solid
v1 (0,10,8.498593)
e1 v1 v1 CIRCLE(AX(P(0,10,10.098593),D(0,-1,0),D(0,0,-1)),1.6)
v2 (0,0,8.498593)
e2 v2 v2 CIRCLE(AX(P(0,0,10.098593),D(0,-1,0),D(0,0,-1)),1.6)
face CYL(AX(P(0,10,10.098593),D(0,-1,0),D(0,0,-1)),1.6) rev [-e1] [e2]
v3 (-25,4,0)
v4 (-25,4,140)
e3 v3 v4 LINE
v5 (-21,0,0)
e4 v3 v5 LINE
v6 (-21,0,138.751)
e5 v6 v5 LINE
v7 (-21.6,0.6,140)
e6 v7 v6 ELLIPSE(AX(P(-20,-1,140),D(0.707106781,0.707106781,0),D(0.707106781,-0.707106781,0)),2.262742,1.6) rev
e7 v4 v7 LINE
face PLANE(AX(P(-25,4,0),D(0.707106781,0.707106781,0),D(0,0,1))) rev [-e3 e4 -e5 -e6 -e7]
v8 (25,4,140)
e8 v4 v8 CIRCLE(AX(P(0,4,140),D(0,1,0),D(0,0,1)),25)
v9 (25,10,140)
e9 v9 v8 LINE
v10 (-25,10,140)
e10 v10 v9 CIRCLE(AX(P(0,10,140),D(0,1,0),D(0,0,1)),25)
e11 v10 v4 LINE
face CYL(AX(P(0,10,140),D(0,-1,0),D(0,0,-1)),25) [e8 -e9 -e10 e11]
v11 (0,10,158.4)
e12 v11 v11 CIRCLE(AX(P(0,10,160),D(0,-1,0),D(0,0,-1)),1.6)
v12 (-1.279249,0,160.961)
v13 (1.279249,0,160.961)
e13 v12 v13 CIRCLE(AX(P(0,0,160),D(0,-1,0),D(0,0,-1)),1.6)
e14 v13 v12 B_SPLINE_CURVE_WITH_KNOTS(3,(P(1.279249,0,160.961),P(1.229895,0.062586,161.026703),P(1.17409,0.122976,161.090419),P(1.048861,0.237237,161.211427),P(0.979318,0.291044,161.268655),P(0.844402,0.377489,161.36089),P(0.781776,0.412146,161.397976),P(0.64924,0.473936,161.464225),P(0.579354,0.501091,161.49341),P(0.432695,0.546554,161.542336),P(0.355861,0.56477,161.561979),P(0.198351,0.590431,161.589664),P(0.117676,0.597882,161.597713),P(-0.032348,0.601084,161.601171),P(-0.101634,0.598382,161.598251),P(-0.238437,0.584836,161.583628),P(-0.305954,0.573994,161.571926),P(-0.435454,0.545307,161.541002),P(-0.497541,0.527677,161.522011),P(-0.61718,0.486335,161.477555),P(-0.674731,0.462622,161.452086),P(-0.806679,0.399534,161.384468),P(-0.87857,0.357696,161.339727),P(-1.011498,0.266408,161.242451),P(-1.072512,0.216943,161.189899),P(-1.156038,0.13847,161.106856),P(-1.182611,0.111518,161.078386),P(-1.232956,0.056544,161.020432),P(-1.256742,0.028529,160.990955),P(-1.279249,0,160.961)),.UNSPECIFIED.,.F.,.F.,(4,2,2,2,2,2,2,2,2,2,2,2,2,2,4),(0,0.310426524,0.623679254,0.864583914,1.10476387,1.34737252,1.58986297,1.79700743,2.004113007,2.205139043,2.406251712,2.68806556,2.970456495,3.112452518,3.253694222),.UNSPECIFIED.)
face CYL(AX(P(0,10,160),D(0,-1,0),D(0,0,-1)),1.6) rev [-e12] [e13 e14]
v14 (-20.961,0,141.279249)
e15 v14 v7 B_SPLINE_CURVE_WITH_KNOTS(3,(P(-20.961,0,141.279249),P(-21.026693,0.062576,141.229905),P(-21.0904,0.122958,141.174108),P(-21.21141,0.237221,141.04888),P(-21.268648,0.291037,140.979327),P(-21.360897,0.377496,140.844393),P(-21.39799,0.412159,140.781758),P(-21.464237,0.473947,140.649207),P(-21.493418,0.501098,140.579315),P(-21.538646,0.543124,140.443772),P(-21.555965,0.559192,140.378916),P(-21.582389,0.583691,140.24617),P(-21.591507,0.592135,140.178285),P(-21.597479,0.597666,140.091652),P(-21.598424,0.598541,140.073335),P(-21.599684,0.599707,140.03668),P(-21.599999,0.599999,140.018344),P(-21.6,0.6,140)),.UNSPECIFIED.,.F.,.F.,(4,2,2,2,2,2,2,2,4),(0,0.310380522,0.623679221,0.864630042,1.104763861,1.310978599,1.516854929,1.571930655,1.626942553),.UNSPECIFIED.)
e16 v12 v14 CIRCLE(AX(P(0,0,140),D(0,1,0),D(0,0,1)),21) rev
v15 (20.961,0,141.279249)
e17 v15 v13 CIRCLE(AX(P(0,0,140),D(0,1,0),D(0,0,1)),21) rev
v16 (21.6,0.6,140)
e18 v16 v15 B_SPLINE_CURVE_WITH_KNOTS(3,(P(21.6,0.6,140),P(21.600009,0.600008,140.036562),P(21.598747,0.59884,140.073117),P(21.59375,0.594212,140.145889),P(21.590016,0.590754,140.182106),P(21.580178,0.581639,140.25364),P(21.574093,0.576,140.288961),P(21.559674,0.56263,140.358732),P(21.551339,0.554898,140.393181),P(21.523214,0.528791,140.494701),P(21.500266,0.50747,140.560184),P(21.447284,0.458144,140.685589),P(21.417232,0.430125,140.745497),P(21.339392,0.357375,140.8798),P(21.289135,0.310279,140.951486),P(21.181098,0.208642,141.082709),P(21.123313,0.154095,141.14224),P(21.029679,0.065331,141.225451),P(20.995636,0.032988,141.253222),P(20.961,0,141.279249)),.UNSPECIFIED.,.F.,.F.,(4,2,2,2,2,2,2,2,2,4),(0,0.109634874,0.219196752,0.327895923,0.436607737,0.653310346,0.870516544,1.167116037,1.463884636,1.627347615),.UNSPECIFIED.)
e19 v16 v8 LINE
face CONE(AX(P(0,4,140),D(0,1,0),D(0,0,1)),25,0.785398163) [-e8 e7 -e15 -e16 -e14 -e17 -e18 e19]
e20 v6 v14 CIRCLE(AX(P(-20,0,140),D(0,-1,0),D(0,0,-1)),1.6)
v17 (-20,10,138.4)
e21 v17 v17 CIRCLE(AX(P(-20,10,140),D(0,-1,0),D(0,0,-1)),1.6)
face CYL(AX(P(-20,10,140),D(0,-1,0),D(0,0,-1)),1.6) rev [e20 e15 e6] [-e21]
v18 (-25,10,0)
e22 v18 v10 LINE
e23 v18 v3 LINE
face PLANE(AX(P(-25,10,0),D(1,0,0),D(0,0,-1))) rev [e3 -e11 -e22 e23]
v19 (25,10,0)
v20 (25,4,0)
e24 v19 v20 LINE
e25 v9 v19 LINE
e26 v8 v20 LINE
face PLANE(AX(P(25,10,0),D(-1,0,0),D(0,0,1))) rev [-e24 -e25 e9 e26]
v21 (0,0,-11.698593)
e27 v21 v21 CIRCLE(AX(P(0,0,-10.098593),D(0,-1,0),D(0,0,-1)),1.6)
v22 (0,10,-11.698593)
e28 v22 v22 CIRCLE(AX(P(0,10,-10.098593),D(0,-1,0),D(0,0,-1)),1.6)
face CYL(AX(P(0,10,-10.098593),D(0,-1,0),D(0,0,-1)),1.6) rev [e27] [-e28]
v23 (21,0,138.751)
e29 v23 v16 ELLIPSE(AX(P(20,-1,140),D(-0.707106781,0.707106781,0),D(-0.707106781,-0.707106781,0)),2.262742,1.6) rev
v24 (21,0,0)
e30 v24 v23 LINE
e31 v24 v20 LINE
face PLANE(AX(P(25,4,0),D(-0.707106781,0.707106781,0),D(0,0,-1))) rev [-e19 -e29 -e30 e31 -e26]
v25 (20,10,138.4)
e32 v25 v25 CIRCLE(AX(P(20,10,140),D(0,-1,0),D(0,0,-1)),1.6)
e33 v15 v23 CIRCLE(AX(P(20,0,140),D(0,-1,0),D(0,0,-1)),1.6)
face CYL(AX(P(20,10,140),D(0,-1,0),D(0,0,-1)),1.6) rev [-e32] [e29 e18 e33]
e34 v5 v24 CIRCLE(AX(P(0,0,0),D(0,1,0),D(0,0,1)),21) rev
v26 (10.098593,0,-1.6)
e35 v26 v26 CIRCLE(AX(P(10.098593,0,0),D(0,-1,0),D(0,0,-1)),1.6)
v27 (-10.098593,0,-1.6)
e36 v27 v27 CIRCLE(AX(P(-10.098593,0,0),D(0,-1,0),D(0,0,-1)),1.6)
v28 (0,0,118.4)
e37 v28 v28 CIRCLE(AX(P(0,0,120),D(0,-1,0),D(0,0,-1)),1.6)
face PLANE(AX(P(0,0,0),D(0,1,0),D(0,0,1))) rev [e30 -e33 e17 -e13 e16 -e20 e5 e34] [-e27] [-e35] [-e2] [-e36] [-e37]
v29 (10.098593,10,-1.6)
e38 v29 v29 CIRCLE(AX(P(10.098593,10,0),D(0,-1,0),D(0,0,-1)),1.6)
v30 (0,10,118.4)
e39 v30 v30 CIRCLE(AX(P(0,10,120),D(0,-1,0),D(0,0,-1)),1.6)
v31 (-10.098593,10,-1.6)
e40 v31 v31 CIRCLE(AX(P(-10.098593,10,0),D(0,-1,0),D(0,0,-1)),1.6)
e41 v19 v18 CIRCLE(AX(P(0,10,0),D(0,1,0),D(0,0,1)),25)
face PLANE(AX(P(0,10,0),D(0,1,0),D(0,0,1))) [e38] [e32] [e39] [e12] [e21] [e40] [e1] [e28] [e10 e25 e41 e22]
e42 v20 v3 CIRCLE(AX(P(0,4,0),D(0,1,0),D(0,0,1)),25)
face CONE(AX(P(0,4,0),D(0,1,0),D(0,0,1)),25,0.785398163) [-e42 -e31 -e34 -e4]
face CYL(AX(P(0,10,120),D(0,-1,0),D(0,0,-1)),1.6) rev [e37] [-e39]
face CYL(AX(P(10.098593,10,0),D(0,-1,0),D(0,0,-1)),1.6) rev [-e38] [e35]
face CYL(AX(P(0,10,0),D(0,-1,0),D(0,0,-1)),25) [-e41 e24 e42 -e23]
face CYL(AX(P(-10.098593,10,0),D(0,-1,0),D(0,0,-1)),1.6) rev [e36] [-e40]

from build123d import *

# Parameters (mm, degrees)
BOSS_EXTRUDE1_DEPTH = 10
SKETCH3_R           = 1.6
CUT_EXTRUDE1_DEPTH  = 168.182534973
SKETCH4_R           = 1.6
CUT_EXTRUDE2_DEPTH  = 168.182534973
CHAMFER1_SIZE       = 4


with BuildPart() as part:
    # Sketch1 → Boss-Extrude1 (new body)
    with BuildSketch(Plane(origin=(0, 0, 0), x_dir=(1, 0, 0), z_dir=(0, 1, 0))):
        with BuildLine():
            Line((-25, 0), (-25, -140))
            ThreePointArc((-25, -140), (0, -165), (25, -140))
            Line((25, -140), (25, 0))
            ThreePointArc((25, 0), (0, 25), (-25, 0))
        make_face()
    extrude(amount=BOSS_EXTRUDE1_DEPTH)

    # Sketch3 → Cut-Extrude1 (cut, through all)
    with BuildSketch(Plane.XZ):
        with Locations(Location((10.098593171, 0, 0), (0, 0, 270))):
            Circle(SKETCH3_R)
        with Locations(Location((0, 10.098593171, 0), (0, 0, 270))):
            Circle(SKETCH3_R)
        with Locations(Location((0, -10.098593171, 0), (0, 0, 270))):
            Circle(SKETCH3_R)
        with Locations(Location((-10.098593171, 0, 0), (0, 0, 270))):
            Circle(SKETCH3_R)
    extrude(amount=-CUT_EXTRUDE1_DEPTH, mode=Mode.SUBTRACT)

    # Sketch4 → Cut-Extrude2 (cut, through all)
    with BuildSketch(Plane.XZ):
        with Locations(Location((0, 120, 0), (0, 0, 270))):
            Circle(SKETCH4_R)
        with Locations(Location((20, 140, 0), (0, 0, 270))):
            Circle(SKETCH4_R)
        with Locations(Location((0, 160, 0), (0, 0, 270))):
            Circle(SKETCH4_R)
        with Locations(Location((-20, 140, 0), (0, 0, 270))):
            Circle(SKETCH4_R)
    extrude(amount=-CUT_EXTRUDE2_DEPTH, mode=Mode.SUBTRACT)

    # Chamfer1
    # the kernel refuses this chamfer: 4 mm, written as the material it takes off along each edge
    with BuildSketch(Plane(origin=(25, 0, 140), x_dir=(-0.9996219169112968, -0.027495876610586365, 0), z_dir=(0, 0, -1))) as chamfer1_piece_1:
        Polygon((CHAMFER1_SIZE * 0.999621916911, CHAMFER1_SIZE * 0.0274958766106), (-CHAMFER1_SIZE * 0.0274958766106, CHAMFER1_SIZE * 0.999621916911), (0, 0), align=None)
    extrude(amount=140, mode=Mode.SUBTRACT)
    with BuildSketch(Plane(origin=(0, 0, 140), x_dir=(-1, 0, 0), z_dir=(0, 0, -1))) as chamfer1_piece_2:
        Polygon((25, CHAMFER1_SIZE), (25 - CHAMFER1_SIZE, 0), (25, 0), align=None)
    revolve(axis=Axis((0, 0, 140), (0, 1, 0)), revolution_arc=180, mode=Mode.SUBTRACT)
    with BuildSketch(Plane(origin=(-25, 0, 0), x_dir=(-0.027495876610586494, 0.9996219169112968, 0), z_dir=(0, 0, 1))) as chamfer1_piece_3:
        Polygon((CHAMFER1_SIZE * 0.999621916911, -CHAMFER1_SIZE * 0.0274958766106), (-CHAMFER1_SIZE * 0.0274958766106, -CHAMFER1_SIZE * 0.999621916911), (0, 0), align=None)
    extrude(amount=140, mode=Mode.SUBTRACT)
    with BuildSketch(Plane(origin=(0, 0, 0), x_dir=(1, 0, 0), z_dir=(0, 0, 1))) as chamfer1_piece_4:
        Polygon((25, CHAMFER1_SIZE), (25 - CHAMFER1_SIZE, 0), (25, 0), align=None)
    revolve(axis=Axis((0, 0, 0), (0, 1, 0)), revolution_arc=180, mode=Mode.SUBTRACT)


solid = part.part
